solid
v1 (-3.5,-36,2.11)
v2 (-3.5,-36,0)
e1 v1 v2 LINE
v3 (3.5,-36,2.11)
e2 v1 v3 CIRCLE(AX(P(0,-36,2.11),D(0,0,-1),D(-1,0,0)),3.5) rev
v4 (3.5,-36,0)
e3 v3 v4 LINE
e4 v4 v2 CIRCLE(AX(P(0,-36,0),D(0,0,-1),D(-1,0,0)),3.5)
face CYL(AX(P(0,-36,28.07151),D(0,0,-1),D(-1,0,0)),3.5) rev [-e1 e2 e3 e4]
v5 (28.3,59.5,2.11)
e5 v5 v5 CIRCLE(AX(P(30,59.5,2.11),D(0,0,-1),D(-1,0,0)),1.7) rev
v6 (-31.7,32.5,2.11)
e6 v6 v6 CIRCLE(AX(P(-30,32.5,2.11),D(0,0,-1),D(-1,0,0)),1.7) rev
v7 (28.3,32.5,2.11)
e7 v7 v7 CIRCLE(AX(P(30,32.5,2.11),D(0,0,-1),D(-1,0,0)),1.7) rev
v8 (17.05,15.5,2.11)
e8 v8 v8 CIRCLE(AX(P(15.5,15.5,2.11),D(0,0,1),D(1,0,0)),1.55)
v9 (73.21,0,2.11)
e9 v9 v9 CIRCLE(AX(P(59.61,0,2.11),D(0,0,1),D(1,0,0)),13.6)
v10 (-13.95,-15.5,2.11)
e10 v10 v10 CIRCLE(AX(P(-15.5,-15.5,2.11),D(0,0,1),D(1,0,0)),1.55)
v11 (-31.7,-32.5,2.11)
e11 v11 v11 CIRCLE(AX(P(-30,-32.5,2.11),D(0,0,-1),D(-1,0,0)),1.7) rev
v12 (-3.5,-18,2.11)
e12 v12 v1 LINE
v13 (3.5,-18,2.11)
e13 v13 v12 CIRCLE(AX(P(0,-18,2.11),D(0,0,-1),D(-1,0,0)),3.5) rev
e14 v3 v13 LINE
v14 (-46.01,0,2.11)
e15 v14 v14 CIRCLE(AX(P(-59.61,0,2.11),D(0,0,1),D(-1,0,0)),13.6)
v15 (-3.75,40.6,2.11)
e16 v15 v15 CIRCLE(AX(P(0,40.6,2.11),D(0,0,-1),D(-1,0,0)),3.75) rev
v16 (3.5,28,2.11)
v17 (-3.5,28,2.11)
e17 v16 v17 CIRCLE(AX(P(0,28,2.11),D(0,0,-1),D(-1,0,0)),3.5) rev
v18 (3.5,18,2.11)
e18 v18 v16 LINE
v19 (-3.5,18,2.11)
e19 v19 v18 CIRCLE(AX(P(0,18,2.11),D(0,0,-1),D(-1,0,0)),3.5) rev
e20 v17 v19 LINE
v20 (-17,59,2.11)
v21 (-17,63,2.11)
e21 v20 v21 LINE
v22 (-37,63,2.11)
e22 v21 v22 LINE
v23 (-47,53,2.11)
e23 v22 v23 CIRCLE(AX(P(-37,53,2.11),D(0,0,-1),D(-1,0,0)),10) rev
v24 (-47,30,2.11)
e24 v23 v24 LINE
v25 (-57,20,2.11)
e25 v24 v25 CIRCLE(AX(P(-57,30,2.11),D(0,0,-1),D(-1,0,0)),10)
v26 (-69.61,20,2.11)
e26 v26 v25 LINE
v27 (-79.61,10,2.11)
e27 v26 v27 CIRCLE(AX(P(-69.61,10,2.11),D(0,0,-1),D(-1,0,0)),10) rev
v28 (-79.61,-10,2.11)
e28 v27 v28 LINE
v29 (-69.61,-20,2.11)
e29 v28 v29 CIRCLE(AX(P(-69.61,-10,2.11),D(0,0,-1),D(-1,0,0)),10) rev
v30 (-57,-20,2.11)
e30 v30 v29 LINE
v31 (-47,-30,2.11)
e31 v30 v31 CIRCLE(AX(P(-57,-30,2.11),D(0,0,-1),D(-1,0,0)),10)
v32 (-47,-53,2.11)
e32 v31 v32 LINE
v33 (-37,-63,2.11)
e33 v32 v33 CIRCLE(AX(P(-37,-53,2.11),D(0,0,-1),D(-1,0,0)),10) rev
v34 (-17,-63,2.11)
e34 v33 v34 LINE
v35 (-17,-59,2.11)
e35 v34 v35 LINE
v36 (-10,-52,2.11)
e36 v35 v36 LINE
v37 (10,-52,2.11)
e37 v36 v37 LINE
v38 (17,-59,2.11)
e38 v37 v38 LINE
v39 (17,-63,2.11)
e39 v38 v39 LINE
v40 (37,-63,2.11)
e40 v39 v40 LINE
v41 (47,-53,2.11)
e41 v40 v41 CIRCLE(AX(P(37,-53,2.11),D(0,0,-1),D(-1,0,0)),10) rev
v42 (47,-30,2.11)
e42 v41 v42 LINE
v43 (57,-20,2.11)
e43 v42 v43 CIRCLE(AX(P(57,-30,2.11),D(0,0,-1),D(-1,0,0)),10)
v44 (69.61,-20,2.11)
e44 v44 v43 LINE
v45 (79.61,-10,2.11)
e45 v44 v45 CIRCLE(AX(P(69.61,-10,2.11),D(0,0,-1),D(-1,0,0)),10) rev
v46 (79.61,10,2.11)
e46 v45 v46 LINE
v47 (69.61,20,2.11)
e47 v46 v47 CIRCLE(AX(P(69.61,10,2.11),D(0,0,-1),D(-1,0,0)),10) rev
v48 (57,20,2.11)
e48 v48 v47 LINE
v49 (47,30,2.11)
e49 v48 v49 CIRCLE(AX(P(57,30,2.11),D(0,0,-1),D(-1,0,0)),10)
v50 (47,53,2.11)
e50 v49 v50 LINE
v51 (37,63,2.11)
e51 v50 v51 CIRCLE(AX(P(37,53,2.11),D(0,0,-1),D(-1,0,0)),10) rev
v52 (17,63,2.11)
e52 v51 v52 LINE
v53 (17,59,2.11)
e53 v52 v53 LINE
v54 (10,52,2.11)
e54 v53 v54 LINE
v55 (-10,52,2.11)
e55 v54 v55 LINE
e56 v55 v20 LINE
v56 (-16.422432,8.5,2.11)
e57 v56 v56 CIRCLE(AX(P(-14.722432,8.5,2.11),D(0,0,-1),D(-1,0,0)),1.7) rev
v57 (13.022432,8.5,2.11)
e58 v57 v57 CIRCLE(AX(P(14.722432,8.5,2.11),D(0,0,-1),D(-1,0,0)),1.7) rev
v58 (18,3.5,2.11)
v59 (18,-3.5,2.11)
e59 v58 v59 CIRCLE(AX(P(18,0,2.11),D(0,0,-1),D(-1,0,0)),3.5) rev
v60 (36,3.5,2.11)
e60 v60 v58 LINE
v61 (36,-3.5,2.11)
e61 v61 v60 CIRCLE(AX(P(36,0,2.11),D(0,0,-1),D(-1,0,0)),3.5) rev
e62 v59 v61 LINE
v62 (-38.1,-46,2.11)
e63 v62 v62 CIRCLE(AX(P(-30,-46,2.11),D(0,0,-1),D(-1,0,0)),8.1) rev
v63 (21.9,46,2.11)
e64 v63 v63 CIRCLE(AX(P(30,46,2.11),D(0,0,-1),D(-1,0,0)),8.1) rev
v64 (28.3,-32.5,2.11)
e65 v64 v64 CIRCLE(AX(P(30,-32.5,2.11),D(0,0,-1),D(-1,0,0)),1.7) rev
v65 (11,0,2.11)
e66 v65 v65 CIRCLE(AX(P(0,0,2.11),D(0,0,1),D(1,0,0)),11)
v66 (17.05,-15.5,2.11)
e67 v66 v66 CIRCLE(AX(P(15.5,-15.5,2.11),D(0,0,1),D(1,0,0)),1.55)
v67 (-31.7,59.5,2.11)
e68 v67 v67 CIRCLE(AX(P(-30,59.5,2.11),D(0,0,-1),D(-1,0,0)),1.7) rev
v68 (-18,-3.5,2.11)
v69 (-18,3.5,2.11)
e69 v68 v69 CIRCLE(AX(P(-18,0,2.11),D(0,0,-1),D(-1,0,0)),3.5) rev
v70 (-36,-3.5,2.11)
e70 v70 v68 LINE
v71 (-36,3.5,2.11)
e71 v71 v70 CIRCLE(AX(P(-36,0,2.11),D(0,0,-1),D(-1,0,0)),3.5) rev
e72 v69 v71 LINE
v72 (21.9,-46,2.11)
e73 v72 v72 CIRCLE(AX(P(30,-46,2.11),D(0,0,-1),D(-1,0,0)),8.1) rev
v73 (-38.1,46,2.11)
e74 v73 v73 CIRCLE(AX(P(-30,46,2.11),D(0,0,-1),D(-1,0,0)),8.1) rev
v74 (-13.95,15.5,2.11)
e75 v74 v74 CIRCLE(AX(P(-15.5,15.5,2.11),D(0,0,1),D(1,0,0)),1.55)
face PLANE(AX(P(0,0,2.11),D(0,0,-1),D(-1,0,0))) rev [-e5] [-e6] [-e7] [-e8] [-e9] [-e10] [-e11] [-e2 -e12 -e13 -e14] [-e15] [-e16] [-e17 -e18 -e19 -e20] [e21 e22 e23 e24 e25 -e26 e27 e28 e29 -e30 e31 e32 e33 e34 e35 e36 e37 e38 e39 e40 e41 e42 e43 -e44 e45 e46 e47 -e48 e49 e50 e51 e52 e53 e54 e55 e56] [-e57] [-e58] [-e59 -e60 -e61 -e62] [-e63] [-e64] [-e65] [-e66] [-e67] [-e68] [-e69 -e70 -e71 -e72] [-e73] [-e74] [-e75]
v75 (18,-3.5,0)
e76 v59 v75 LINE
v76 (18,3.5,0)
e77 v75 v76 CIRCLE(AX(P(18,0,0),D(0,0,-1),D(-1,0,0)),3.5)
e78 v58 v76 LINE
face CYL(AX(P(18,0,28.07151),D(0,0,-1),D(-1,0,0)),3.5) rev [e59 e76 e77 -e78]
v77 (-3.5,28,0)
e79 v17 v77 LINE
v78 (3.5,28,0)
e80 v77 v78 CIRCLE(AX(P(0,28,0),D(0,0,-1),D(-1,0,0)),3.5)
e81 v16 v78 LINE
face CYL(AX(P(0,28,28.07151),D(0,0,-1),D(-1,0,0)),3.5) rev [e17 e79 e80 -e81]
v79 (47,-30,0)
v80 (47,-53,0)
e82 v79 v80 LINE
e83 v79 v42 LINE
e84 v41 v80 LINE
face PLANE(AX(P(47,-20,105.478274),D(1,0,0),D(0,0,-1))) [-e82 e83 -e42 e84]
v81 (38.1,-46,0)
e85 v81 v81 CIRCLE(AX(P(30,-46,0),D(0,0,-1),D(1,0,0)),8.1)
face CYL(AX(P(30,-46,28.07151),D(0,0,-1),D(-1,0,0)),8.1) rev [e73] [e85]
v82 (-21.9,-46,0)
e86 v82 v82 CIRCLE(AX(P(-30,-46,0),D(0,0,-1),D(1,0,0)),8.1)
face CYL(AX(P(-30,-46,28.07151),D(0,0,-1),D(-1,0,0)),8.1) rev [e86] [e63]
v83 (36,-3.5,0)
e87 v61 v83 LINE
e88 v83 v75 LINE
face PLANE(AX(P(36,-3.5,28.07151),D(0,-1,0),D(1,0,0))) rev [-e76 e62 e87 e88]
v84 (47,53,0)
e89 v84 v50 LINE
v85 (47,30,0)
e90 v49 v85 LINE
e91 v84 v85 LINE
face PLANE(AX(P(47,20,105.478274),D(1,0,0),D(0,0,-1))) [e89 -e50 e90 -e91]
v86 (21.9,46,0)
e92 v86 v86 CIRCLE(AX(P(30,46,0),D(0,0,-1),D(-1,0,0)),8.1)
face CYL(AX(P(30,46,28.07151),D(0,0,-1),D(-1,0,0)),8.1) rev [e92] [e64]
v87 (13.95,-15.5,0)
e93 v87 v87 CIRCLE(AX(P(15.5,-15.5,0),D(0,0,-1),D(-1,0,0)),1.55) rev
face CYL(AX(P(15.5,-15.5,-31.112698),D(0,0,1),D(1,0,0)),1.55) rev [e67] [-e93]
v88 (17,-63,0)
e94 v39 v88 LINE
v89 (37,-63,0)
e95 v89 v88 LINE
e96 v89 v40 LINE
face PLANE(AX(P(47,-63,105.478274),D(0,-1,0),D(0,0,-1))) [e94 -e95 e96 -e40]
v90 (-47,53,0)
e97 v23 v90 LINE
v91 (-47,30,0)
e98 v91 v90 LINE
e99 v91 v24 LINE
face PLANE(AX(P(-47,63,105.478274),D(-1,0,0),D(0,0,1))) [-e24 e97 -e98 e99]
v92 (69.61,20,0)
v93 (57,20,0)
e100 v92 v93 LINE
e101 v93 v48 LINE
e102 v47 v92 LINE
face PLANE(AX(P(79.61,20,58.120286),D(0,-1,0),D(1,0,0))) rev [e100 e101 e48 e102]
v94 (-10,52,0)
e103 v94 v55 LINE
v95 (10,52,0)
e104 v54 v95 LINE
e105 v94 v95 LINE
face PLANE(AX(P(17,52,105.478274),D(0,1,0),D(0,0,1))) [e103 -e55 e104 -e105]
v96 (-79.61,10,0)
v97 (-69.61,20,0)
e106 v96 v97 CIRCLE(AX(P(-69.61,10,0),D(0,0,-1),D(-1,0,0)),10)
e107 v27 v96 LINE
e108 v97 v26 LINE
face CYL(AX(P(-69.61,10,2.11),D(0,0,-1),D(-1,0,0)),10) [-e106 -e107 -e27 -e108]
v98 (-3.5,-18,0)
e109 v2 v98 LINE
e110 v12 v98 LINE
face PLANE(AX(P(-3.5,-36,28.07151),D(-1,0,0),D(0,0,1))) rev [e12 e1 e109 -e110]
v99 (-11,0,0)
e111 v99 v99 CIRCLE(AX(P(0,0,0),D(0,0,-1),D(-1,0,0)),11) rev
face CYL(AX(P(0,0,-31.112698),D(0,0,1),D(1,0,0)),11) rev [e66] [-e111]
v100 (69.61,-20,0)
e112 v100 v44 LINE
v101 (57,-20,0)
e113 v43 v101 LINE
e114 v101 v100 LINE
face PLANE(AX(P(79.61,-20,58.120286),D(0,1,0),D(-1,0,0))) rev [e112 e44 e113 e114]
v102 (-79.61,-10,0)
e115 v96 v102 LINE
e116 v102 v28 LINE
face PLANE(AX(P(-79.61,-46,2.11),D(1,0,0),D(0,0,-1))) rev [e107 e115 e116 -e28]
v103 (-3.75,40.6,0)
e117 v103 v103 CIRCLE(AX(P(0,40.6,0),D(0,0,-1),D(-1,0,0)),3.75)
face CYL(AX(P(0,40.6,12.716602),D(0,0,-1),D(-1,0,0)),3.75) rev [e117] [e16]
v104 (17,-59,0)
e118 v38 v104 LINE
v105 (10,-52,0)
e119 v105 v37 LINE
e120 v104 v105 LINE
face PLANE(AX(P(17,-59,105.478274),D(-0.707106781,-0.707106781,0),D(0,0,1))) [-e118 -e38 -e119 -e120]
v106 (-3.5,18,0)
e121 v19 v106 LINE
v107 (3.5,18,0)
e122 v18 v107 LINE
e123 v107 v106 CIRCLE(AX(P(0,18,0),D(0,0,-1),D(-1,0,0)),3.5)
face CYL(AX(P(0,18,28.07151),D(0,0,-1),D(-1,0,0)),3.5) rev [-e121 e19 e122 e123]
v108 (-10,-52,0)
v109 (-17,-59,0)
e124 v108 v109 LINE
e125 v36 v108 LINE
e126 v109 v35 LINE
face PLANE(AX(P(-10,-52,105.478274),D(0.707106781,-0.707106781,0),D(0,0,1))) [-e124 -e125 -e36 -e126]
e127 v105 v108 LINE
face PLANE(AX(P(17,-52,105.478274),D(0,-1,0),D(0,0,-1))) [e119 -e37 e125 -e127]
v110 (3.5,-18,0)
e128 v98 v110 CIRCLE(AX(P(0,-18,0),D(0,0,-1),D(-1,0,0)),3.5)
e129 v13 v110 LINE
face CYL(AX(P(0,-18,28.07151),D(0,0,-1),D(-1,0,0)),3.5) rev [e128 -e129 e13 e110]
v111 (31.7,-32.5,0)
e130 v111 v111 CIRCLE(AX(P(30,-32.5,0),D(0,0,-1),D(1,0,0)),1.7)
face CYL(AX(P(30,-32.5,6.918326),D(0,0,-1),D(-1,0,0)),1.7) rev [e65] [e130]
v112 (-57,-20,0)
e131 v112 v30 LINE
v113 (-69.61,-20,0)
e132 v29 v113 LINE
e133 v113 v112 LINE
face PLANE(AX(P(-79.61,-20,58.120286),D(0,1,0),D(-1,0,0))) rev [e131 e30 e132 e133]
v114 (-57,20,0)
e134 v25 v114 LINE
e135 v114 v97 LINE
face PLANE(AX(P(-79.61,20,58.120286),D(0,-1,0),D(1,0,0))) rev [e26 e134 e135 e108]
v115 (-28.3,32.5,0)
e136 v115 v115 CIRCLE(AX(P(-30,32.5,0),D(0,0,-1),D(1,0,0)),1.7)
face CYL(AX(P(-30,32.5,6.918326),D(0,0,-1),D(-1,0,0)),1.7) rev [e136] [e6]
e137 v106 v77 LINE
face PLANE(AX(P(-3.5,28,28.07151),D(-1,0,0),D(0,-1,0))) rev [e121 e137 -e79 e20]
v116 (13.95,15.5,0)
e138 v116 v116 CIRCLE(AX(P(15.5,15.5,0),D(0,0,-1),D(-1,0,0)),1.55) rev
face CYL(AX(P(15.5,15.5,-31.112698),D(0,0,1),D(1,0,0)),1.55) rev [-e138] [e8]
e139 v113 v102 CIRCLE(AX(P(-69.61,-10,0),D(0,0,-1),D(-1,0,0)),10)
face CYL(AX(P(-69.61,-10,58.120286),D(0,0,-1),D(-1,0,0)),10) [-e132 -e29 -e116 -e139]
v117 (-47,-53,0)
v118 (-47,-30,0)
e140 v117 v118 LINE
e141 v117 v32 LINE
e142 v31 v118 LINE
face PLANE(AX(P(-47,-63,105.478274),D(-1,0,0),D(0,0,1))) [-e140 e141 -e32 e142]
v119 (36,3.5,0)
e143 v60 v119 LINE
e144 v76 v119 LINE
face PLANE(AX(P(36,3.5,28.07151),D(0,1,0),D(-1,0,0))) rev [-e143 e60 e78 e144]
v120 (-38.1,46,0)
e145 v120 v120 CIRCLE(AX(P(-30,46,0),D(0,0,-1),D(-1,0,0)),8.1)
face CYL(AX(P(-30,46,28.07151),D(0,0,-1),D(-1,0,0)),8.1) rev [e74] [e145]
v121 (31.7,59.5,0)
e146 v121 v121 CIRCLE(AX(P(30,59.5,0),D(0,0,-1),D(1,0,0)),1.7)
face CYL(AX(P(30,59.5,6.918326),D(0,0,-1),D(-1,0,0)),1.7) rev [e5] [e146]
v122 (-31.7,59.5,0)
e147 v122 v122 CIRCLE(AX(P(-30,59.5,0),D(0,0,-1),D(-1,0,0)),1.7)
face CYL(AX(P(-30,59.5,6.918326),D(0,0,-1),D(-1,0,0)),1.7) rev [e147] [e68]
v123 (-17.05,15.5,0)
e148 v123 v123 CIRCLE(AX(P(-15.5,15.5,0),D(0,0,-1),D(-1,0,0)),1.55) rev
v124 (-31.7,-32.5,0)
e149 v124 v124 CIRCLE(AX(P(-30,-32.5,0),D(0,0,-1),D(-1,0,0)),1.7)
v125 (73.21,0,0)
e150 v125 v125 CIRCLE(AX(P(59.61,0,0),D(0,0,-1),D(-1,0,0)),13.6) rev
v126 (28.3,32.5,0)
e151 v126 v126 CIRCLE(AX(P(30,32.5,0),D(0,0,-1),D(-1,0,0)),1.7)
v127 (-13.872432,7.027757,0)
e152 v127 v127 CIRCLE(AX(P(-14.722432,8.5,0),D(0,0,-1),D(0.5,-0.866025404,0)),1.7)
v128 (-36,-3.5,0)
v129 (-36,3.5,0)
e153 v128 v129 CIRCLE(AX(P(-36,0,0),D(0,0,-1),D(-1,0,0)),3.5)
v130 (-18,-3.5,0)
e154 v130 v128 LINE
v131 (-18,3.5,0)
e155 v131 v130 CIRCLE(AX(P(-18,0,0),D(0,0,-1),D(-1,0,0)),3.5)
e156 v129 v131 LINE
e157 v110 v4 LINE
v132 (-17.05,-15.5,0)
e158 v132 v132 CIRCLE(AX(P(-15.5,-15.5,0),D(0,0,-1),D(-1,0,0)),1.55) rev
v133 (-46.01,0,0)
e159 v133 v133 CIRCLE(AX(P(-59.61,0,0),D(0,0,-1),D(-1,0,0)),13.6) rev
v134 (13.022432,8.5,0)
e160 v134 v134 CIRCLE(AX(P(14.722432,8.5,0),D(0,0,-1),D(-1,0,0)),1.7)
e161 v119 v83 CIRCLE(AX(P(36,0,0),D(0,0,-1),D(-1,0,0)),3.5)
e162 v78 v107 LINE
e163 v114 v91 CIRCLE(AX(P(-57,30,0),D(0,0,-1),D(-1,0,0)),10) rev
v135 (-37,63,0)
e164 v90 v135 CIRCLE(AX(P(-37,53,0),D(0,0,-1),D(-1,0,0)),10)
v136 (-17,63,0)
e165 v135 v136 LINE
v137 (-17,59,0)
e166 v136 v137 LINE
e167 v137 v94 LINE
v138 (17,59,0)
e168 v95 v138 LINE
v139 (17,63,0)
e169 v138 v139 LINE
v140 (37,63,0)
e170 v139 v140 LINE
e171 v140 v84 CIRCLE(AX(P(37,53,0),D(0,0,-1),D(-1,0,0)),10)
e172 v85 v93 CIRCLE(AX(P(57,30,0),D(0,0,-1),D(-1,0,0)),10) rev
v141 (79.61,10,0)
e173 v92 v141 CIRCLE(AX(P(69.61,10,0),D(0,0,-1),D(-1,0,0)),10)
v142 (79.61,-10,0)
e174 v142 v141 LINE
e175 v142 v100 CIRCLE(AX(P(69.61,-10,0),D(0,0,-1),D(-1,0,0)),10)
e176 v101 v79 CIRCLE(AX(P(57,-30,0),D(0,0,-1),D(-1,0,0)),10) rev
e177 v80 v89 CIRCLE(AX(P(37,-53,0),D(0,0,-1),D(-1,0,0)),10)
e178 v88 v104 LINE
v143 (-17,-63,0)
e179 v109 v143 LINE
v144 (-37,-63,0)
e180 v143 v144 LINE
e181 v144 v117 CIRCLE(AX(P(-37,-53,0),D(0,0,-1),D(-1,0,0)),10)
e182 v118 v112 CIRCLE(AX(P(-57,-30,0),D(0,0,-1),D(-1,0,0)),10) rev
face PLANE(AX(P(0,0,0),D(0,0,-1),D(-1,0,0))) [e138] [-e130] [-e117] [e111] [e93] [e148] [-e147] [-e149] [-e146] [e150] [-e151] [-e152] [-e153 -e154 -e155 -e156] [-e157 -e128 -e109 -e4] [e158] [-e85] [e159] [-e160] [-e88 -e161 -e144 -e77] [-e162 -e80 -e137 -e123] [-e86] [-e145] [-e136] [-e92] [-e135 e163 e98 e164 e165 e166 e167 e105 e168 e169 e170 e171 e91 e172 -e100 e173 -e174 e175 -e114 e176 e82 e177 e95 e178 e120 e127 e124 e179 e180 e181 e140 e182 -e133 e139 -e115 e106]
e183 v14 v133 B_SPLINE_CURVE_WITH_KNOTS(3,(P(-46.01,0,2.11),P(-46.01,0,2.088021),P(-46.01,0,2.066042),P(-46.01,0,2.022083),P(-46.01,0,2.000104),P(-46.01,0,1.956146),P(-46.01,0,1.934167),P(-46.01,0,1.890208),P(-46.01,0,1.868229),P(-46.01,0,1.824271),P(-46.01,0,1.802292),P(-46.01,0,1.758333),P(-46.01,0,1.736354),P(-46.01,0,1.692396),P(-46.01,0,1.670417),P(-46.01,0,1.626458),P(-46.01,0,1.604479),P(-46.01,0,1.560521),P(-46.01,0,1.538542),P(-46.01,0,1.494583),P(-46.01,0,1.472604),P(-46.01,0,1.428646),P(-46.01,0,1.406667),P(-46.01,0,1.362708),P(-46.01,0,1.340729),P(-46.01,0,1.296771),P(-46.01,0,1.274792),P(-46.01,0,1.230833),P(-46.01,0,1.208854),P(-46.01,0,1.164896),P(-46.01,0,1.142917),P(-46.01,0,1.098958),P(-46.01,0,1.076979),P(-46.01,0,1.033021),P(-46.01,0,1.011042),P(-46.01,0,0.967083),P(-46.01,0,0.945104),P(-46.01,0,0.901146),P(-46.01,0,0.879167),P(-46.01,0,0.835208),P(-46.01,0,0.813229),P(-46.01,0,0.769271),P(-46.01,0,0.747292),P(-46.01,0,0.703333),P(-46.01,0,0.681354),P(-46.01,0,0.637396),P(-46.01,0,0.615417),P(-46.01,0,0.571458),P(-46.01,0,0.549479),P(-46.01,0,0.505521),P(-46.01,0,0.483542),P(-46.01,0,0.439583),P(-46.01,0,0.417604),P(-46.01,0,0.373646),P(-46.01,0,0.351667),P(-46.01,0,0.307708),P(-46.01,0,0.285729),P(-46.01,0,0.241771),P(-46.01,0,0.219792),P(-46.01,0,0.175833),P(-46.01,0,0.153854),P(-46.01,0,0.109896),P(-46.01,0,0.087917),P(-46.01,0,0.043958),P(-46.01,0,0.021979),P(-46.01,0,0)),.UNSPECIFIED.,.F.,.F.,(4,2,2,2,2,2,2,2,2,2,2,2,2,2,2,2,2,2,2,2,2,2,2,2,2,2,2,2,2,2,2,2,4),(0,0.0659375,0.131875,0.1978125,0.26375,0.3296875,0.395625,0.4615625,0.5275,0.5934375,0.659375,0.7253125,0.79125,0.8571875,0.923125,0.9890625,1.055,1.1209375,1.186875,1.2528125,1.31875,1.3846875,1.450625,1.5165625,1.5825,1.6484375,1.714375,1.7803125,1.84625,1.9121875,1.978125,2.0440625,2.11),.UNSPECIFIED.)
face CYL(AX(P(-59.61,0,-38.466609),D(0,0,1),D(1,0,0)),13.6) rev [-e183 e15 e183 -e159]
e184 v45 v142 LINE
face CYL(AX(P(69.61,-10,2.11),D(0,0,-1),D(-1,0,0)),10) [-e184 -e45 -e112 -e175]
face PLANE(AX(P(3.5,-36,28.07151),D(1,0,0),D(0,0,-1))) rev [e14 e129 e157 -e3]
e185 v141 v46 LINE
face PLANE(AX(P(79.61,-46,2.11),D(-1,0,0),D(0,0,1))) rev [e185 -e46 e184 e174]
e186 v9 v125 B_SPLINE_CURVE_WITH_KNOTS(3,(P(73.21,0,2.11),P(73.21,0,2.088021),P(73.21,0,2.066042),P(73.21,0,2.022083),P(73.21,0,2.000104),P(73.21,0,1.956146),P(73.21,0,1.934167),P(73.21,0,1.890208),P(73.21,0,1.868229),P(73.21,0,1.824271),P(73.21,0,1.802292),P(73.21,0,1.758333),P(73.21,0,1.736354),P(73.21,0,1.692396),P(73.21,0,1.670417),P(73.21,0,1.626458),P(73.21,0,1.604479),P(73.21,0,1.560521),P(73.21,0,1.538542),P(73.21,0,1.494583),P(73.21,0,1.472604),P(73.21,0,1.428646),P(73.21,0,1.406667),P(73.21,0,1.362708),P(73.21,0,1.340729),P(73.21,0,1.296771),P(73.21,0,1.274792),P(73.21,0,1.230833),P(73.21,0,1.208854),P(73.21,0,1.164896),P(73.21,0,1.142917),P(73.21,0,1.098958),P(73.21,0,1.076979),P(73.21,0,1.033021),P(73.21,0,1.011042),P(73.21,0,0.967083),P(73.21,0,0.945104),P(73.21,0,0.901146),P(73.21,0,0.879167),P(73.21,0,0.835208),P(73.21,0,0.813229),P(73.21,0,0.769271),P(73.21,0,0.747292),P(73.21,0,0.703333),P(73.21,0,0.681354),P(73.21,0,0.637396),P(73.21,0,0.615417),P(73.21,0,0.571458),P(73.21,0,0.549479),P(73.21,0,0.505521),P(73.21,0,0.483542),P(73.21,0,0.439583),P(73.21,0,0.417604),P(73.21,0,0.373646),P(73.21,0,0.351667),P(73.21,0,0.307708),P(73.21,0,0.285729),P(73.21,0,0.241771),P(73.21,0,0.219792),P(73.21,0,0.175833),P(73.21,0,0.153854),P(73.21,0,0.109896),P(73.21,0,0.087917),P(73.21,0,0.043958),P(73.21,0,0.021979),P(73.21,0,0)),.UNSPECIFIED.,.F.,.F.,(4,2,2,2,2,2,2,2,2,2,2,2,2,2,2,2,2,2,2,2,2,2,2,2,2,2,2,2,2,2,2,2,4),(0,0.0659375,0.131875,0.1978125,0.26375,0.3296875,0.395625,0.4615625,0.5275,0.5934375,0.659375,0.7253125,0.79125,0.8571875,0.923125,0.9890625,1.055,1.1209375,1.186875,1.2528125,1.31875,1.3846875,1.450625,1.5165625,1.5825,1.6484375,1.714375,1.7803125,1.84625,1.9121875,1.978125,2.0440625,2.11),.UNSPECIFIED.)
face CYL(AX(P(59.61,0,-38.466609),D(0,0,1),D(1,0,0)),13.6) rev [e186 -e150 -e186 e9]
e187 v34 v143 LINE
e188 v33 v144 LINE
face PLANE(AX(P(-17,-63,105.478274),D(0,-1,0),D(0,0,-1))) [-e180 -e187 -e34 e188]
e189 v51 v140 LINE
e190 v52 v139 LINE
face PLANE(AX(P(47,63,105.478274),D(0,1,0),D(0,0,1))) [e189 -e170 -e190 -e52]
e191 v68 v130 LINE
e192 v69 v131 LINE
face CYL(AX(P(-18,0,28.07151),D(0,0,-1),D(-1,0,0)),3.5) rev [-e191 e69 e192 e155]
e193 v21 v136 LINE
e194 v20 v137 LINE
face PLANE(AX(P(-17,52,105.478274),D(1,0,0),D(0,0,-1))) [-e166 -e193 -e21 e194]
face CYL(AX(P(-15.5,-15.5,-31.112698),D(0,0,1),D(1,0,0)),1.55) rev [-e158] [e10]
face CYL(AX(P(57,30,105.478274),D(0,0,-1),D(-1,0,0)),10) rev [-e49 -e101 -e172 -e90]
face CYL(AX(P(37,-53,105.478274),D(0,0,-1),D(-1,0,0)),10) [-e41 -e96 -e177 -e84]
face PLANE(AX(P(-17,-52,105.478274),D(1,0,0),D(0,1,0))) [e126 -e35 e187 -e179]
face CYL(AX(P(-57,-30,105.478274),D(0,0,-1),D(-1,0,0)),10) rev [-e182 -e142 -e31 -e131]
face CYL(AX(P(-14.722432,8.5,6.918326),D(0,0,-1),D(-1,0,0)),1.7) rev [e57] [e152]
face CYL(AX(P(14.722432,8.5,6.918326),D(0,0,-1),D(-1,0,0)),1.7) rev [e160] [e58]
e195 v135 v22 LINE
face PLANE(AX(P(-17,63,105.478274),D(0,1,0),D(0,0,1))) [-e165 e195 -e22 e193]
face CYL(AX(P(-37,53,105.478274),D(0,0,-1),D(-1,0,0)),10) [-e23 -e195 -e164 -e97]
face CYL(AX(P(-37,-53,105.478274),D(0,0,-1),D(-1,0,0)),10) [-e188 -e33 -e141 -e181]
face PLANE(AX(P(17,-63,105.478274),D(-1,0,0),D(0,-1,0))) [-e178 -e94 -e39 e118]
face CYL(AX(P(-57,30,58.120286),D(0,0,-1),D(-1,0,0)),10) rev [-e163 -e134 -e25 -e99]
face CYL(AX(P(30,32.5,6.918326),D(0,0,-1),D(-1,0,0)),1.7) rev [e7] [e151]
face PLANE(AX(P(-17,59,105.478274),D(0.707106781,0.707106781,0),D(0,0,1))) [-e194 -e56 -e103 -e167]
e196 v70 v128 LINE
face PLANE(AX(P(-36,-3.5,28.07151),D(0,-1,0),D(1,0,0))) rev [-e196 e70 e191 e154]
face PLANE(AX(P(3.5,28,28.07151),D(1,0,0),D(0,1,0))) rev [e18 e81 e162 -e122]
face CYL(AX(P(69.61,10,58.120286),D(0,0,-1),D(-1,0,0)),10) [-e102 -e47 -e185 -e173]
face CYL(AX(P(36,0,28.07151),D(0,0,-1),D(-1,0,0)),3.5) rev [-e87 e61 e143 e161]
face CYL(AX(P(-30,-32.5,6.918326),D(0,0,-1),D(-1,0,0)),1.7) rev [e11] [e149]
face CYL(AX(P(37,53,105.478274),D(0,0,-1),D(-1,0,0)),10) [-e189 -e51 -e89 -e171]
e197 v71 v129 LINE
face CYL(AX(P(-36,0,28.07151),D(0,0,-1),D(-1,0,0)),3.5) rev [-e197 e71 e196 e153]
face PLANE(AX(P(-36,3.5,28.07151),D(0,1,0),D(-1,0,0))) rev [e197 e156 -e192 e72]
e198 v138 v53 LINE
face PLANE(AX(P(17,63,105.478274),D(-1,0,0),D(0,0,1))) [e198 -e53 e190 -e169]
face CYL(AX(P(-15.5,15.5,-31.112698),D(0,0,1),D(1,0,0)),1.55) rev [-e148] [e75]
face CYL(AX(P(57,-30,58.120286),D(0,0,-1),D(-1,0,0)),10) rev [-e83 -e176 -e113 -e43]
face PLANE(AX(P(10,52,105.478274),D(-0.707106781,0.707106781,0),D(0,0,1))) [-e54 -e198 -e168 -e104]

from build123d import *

# Parameters (mm, degrees)
CROQUIS1_W              = 159.22
CROQUIS1_H              = 92
SALIENTE_EXTRUIR1_DEPTH = 2.11
CROQUIS2_R              = 13.6
CORTAR_EXTRUIR1_DEPTH   = 2.11
CROQUIS3_R              = 11
CROQUIS3_R_2            = 1.55
CORTAR_EXTRUIR2_DEPTH   = 2.11
CROQUIS4_W              = 49.61
CROQUIS4_H              = 26
CORTAR_EXTRUIR3_DEPTH   = 2.11
SALIENTE_EXTRUIR2_DEPTH = 2.11
REDONDEO2_R             = 10
CROQUIS5_R              = 8.1
CORTAR_EXTRUIR4_DEPTH   = 2.11
CHAFL_N1_SIZE           = 7
CROQUIS8_R              = 1.7
CORTAR_EXTRUIR5_DEPTH   = 2.11
MATRIZC1_OUTLINE_R      = 1.7
MATRIZC1_DEPTH          = 2.11
CROQUIS9_R              = 1.7
CORTAR_EXTRUIR6_DEPTH   = 2.11
CROQUIS10_R             = 3.75
CORTAR_EXTRUIR7_DEPTH   = 2.11


# Read off the part's stored shape, not the designer's step: MatrizC1
with BuildPart() as part:
    # Croquis1 → Saliente-Extruir1 (new body)
    with BuildSketch(Plane.XY):
        Rectangle(CROQUIS1_W, CROQUIS1_H)
    extrude(amount=SALIENTE_EXTRUIR1_DEPTH)

    # Croquis2 → Cortar-Extruir1 (cut)
    with BuildSketch(Plane.XY.offset(2.11)):
        with Locations((59.61, 0)):
            Circle(CROQUIS2_R)
        with Locations((-59.61, 0)):
            Circle(CROQUIS2_R)
    extrude(amount=-CORTAR_EXTRUIR1_DEPTH, mode=Mode.SUBTRACT)

    # Croquis3 → Cortar-Extruir2 (cut)
    with BuildSketch(Plane.XY.offset(2.11)):
        Circle(CROQUIS3_R)
        with Locations((15.5, 15.5)):
            Circle(CROQUIS3_R_2)
        with Locations((15.5, -15.5)):
            Circle(CROQUIS3_R_2)
        with Locations((-15.5, -15.5)):
            Circle(CROQUIS3_R_2)
        with Locations((-15.5, 15.5)):
            Circle(CROQUIS3_R_2)
    extrude(amount=-CORTAR_EXTRUIR2_DEPTH, mode=Mode.SUBTRACT)

    # Croquis4 → Cortar-Extruir3 (cut)
    with BuildSketch(Plane(origin=(0, 0, 0), x_dir=(-1, 0, 0), z_dir=(0, 0, -1))):
        with Locations((-54.805, 33)):
            Rectangle(CROQUIS4_W, CROQUIS4_H)
        with Locations((-54.805, -33)):
            Rectangle(CROQUIS4_W, CROQUIS4_H)
        with Locations((54.805, -33)):
            Rectangle(CROQUIS4_W, CROQUIS4_H)
        with Locations((54.805, 33)):
            Rectangle(CROQUIS4_W, CROQUIS4_H)
    extrude(amount=-CORTAR_EXTRUIR3_DEPTH, mode=Mode.SUBTRACT)

    # Croquis6 → Saliente-Extruir2 (add)
    with BuildSketch(Plane(origin=(0, 0, 0), x_dir=(-1, 0, 0), z_dir=(0, 0, -1))):
        Polygon((-47, 20), (-30, 20), (-30, 46), (30, 46), (30, 20), (47, 20), (47, 63), (17, 63), (17, 52), (-17, 52), (-17, 63), (-47, 63), align=None)
        Polygon((-30, -46), (30, -46), (30, -20), (47, -20), (47, -63), (17, -63), (17, -52), (-17, -52), (-17, -63), (-47, -63), (-47, -20), (-30, -20), align=None)
    extrude(amount=-SALIENTE_EXTRUIR2_DEPTH)

    # Redondeo2
    redondeo2_edges = [part.edges().sort_by_distance(p)[0] for p in [
        (47, 20, 1.055),
        (47, 63, 1.055),
        (-47, 63, 1.055),
        (-47, 20, 1.055),
        (-47, -20, 1.055),
        (-47, -63, 1.055),
        (47, -63, 1.055),
        (47, -20, 1.055),
        (-79.61, 20, 1.055),
        (-79.61, -20, 1.055),
        (79.61, -20, 1.055),
        (79.61, 20, 1.055),
    ]]
    fillet(redondeo2_edges, radius=REDONDEO2_R)

    # Croquis5 → Cortar-Extruir4 (cut)
    with BuildSketch(Plane(origin=(0, 0, 0), x_dir=(-1, 0, 0), z_dir=(0, 0, -1))):
        with Locations((-30, 46)):
            Circle(CROQUIS5_R)
        with Locations((30, 46)):
            Circle(CROQUIS5_R)
        with Locations((30, -46)):
            Circle(CROQUIS5_R)
        with Locations((-30, -46)):
            Circle(CROQUIS5_R)
        with BuildLine():
            Line((-3.5, -36), (-3.5, -18))
            ThreePointArc((-3.5, -18), (0, -14.5), (3.5, -18))
            Line((3.5, -18), (3.5, -36))
            ThreePointArc((3.5, -36), (0, -39.5), (-3.5, -36))
        make_face()
        with BuildLine():
            Line((-36, 3.5), (-18, 3.5))
            ThreePointArc((-18, 3.5), (-14.5, 0), (-18, -3.5))
            Line((-18, -3.5), (-36, -3.5))
            ThreePointArc((-36, -3.5), (-39.5, 0), (-36, 3.5))
        make_face()
        with BuildLine():
            Line((3.5, 28), (3.5, 18))
            ThreePointArc((3.5, 18), (0, 14.5), (-3.5, 18))
            Line((-3.5, 18), (-3.5, 28))
            ThreePointArc((-3.5, 28), (0, 31.5), (3.5, 28))
        make_face()
        with BuildLine():
            Line((36, -3.5), (18, -3.5))
            ThreePointArc((18, -3.5), (14.5, 0), (18, 3.5))
            Line((18, 3.5), (36, 3.5))
            ThreePointArc((36, 3.5), (39.5, 0), (36, -3.5))
        make_face()
    extrude(amount=-CORTAR_EXTRUIR4_DEPTH, mode=Mode.SUBTRACT)

    # Chaflán1
    chafl_n1_edges = [part.edges().sort_by_distance(p)[0] for p in [
        (17, 52, 1.055),
        (-17, 52, 1.055),
        (-17, -52, 1.055),
        (17, -52, 1.055),
    ]]
    chamfer(chafl_n1_edges, length=CHAFL_N1_SIZE)

    # Croquis8 → Cortar-Extruir5 (cut)
    with BuildSketch(Plane(origin=(0, 0, 0), x_dir=(-1, 0, 0), z_dir=(0, 0, -1))):
        with Locations((-14.722431864, 8.5)):
            Circle(CROQUIS8_R)
    extrude(amount=-CORTAR_EXTRUIR5_DEPTH, mode=Mode.SUBTRACT)

    # MatrizC1 outline → MatrizC1 (cut)
    with BuildSketch(Plane.XY):
        with Locations((-14.722431864, 8.5)):
            Circle(MATRIZC1_OUTLINE_R)
    extrude(amount=MATRIZC1_DEPTH, mode=Mode.SUBTRACT)

    # Croquis9 → Cortar-Extruir6 (cut)
    with BuildSketch(Plane(origin=(0, 0, 0), x_dir=(-1, 0, 0), z_dir=(0, 0, -1))):
        with Locations((-30, 32.5)):
            Circle(CROQUIS9_R)
        with Locations((30, 32.5)):
            Circle(CROQUIS9_R)
        with Locations((-30, 59.5)):
            Circle(CROQUIS9_R)
        with Locations((30, -32.5)):
            Circle(CROQUIS9_R)
        with Locations((-30, -32.5)):
            Circle(CROQUIS9_R)
        with Locations((30, 59.5)):
            Circle(CROQUIS9_R)
    extrude(amount=-CORTAR_EXTRUIR6_DEPTH, mode=Mode.SUBTRACT)

    # Croquis10 → Cortar-Extruir7 (cut)
    with BuildSketch(Plane(origin=(0, 0, 0), x_dir=(-1, 0, 0), z_dir=(0, 0, -1))):
        with Locations((0, 40.6)):
            Circle(CROQUIS10_R)
    extrude(amount=-CORTAR_EXTRUIR7_DEPTH, mode=Mode.SUBTRACT)


solid = part.part
